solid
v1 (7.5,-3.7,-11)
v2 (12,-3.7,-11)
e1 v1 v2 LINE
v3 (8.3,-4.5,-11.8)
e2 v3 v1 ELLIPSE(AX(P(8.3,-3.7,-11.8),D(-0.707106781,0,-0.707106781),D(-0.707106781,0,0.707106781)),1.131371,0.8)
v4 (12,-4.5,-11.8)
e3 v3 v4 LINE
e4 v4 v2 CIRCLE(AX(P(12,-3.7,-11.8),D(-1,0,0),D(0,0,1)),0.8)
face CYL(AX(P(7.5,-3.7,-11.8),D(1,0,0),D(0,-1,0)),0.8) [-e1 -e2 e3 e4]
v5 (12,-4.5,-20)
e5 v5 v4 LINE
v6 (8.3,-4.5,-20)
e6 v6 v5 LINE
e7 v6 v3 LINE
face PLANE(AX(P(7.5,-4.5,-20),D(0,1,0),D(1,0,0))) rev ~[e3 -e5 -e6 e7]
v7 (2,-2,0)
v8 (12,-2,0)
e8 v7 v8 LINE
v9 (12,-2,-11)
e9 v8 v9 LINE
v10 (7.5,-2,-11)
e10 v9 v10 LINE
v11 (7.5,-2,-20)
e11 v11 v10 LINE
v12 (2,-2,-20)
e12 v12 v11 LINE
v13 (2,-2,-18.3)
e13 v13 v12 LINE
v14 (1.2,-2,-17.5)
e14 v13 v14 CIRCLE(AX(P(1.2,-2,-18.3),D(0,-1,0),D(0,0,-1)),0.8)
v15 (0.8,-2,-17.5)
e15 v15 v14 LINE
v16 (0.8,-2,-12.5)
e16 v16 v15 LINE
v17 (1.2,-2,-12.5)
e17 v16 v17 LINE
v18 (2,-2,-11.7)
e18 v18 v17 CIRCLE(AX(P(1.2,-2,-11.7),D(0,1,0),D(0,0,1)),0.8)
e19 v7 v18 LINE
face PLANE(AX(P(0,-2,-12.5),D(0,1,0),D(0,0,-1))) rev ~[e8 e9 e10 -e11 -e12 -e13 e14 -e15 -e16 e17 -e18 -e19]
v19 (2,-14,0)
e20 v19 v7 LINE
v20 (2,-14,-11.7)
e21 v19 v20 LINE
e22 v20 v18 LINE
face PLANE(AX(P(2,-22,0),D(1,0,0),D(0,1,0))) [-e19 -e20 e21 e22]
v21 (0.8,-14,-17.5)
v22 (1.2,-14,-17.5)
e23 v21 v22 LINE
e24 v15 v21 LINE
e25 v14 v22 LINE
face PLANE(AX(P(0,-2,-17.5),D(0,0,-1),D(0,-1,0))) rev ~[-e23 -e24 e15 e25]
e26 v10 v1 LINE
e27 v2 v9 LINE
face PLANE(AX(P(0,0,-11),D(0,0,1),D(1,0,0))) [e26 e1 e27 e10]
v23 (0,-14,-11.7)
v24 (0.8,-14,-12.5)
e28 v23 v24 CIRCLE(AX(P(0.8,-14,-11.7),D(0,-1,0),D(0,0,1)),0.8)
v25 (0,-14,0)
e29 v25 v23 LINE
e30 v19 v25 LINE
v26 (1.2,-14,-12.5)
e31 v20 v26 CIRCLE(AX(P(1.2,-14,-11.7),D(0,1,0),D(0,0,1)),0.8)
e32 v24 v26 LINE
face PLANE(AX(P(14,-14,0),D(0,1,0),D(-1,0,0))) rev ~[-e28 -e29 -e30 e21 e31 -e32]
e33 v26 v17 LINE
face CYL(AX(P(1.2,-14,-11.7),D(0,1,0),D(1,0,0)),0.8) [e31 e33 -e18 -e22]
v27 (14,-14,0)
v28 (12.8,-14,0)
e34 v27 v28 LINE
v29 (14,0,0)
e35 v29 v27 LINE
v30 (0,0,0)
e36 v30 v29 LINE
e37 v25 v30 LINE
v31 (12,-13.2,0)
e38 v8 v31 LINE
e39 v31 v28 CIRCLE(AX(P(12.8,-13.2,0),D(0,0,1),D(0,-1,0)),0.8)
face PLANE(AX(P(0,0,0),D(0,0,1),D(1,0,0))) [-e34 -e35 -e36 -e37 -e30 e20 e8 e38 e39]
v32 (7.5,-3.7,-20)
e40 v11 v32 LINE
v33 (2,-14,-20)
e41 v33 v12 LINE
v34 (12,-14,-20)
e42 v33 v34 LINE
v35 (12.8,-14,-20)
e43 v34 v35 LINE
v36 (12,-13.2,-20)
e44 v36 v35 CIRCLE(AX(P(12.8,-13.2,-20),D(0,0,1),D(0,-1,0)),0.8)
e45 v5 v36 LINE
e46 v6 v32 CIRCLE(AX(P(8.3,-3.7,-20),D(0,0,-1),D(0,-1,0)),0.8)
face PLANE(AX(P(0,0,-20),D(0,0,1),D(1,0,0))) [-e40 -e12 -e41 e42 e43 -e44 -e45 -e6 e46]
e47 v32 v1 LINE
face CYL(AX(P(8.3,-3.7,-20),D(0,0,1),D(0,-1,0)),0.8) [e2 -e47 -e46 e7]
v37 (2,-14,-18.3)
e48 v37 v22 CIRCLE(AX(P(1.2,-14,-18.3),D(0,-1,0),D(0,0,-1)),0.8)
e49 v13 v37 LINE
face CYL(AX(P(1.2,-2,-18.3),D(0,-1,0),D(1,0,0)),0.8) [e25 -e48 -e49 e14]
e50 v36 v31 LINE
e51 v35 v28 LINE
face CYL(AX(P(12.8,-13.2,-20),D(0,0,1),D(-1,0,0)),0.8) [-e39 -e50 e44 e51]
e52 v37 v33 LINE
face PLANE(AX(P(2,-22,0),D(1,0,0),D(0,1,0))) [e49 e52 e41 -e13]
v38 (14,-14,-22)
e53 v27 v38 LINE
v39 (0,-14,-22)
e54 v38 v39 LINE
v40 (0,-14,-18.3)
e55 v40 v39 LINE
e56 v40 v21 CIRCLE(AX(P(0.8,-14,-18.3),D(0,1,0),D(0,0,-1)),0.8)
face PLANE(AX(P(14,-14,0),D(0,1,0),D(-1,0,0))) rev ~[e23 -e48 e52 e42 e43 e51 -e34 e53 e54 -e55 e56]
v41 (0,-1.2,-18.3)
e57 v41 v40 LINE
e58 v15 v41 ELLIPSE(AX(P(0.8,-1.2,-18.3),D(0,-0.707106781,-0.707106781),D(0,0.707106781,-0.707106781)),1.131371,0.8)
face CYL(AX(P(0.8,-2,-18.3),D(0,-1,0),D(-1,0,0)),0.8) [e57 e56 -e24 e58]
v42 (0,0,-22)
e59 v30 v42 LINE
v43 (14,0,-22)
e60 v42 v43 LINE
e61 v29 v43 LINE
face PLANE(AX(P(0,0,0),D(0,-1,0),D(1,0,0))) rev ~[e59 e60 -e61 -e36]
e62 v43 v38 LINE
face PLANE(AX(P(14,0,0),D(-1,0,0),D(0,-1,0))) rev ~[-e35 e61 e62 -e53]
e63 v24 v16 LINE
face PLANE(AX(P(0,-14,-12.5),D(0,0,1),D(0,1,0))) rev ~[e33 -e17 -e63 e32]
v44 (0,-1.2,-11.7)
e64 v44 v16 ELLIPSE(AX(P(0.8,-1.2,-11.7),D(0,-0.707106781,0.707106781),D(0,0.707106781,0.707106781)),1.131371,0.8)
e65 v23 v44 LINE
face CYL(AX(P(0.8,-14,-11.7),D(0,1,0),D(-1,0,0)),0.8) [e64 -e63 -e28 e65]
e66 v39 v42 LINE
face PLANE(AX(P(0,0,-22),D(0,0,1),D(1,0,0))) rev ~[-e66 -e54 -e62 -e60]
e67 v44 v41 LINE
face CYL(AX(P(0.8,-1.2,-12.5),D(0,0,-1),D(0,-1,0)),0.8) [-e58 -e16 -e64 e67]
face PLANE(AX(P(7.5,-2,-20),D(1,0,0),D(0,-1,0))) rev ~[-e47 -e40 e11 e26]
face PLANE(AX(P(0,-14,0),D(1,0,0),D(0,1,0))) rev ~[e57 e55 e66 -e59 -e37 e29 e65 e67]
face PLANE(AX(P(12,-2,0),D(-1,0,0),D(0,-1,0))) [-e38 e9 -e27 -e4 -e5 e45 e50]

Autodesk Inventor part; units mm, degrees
ref_plane "YZ Plane" through (0, 0, 0) normal (1, 0, 0) x (0, 1, 0)
ref_plane "XZ Plane" through (0, 0, 0) normal (0, 1, 0) x (-1, 0, 0)
ref_plane "XY Plane" through (0, 0, 0) normal (0, 0, 1) x (1, 0, 0)
sketch "Sketch1" plane through (0, 0, 0) normal (0, 0, 1) x (1, 0, 0)
  line L0 (0, 0) -> (14, 0)
  line L1 (14, 0) -> (14, -14)
  line L2 (14, -14) -> (0, -14)
  line L3 (0, -14) -> (0, 0)
  dimension "d0" = 14
  dimension "d1" = 14
extrude "Extrusion1" add sketch "Sketch1" against normal blind 22
sketch "Sketch2" plane through (0, 0, 0) normal (0, 0, 1) x (1, 0, 0)
  line L0 (2, -2) -> (12, -2)
  line L1 (12, -2) -> (12, -22)
  line L2 (12, -22) -> (2, -22)
  line L3 (2, -22) -> (2, -2)
  point P0 (0, 0)
  dimension "d4" = 10
  dimension "d5" = 20
extrude "Extrusion2" cut sketch "Sketch2" against normal blind 20
sketch "Sketch8" plane through (0, -14, 0) normal (-1, 0, 0) x (0, 0, 1)
  point P0 (0, 14)
sketch "Sketch9" plane through (0, -14, 0) normal (-1, 0, 0) x (0, 0, 1)
  point P0 (0, 14)
sketch "Sketch11" plane through (0, -14, 0) normal (-1, 0, 0) x (0, 0, 1)
  point P0 (0, 14)
sketch "Sketch14" plane through (0, -14, 0) normal (-1, 0, 0) x (0, 0, 1)
  point P0 (0, 14)
sketch "Sketch15" plane through (0, -14, 0) normal (-1, 0, 0) x (0, 0, 1)
  point P0 (0, 14)
sketch "Sketch16" plane through (0, -14, 0) normal (-1, 0, 0) x (0, 0, 1)
  line L0 (-12.5, 12) -> (-17.5, 12)
  line L1 (-17.5, 12) -> (-17.5, 0)
  line L2 (-17.5, 0) -> (-12.5, 0)
  line L3 (-12.5, 0) -> (-12.5, 12)
  point P0 (0, 14)
  dimension "d30" = 5
  dimension "d31" = 12
extrude "Extrusion10" cut sketch "Sketch16" against normal blind 2
sketch "Sketch17" plane through (0, 0, -20) normal (0, 0, 1) x (1, 0, 0)
  line L0 (12, -2) -> (7.5, -2)
  line L1 (7.5, -2) -> (7.5, -4.5)
  line L2 (7.5, -4.5) -> (12, -4.5)
  line L3 (12, -4.5) -> (12, -2)
  point P0 (0, 0)
  dimension "d34" = 4.5
  dimension "d35" = 2.5
extrude "Extrusion11" add sketch "Sketch17" along normal blind 9
fillet "Fillet1" radius 0.8 8 edges at (0, -8, -12.5) (2, -8, -12.5) (0, -2, -15) (0, -8, -17.5) (2, -8, -17.5) (12, -14, -10) (7.5, -4.5, -15.5) (9.75, -4.5, -11)
properties part number "housing_v08"
